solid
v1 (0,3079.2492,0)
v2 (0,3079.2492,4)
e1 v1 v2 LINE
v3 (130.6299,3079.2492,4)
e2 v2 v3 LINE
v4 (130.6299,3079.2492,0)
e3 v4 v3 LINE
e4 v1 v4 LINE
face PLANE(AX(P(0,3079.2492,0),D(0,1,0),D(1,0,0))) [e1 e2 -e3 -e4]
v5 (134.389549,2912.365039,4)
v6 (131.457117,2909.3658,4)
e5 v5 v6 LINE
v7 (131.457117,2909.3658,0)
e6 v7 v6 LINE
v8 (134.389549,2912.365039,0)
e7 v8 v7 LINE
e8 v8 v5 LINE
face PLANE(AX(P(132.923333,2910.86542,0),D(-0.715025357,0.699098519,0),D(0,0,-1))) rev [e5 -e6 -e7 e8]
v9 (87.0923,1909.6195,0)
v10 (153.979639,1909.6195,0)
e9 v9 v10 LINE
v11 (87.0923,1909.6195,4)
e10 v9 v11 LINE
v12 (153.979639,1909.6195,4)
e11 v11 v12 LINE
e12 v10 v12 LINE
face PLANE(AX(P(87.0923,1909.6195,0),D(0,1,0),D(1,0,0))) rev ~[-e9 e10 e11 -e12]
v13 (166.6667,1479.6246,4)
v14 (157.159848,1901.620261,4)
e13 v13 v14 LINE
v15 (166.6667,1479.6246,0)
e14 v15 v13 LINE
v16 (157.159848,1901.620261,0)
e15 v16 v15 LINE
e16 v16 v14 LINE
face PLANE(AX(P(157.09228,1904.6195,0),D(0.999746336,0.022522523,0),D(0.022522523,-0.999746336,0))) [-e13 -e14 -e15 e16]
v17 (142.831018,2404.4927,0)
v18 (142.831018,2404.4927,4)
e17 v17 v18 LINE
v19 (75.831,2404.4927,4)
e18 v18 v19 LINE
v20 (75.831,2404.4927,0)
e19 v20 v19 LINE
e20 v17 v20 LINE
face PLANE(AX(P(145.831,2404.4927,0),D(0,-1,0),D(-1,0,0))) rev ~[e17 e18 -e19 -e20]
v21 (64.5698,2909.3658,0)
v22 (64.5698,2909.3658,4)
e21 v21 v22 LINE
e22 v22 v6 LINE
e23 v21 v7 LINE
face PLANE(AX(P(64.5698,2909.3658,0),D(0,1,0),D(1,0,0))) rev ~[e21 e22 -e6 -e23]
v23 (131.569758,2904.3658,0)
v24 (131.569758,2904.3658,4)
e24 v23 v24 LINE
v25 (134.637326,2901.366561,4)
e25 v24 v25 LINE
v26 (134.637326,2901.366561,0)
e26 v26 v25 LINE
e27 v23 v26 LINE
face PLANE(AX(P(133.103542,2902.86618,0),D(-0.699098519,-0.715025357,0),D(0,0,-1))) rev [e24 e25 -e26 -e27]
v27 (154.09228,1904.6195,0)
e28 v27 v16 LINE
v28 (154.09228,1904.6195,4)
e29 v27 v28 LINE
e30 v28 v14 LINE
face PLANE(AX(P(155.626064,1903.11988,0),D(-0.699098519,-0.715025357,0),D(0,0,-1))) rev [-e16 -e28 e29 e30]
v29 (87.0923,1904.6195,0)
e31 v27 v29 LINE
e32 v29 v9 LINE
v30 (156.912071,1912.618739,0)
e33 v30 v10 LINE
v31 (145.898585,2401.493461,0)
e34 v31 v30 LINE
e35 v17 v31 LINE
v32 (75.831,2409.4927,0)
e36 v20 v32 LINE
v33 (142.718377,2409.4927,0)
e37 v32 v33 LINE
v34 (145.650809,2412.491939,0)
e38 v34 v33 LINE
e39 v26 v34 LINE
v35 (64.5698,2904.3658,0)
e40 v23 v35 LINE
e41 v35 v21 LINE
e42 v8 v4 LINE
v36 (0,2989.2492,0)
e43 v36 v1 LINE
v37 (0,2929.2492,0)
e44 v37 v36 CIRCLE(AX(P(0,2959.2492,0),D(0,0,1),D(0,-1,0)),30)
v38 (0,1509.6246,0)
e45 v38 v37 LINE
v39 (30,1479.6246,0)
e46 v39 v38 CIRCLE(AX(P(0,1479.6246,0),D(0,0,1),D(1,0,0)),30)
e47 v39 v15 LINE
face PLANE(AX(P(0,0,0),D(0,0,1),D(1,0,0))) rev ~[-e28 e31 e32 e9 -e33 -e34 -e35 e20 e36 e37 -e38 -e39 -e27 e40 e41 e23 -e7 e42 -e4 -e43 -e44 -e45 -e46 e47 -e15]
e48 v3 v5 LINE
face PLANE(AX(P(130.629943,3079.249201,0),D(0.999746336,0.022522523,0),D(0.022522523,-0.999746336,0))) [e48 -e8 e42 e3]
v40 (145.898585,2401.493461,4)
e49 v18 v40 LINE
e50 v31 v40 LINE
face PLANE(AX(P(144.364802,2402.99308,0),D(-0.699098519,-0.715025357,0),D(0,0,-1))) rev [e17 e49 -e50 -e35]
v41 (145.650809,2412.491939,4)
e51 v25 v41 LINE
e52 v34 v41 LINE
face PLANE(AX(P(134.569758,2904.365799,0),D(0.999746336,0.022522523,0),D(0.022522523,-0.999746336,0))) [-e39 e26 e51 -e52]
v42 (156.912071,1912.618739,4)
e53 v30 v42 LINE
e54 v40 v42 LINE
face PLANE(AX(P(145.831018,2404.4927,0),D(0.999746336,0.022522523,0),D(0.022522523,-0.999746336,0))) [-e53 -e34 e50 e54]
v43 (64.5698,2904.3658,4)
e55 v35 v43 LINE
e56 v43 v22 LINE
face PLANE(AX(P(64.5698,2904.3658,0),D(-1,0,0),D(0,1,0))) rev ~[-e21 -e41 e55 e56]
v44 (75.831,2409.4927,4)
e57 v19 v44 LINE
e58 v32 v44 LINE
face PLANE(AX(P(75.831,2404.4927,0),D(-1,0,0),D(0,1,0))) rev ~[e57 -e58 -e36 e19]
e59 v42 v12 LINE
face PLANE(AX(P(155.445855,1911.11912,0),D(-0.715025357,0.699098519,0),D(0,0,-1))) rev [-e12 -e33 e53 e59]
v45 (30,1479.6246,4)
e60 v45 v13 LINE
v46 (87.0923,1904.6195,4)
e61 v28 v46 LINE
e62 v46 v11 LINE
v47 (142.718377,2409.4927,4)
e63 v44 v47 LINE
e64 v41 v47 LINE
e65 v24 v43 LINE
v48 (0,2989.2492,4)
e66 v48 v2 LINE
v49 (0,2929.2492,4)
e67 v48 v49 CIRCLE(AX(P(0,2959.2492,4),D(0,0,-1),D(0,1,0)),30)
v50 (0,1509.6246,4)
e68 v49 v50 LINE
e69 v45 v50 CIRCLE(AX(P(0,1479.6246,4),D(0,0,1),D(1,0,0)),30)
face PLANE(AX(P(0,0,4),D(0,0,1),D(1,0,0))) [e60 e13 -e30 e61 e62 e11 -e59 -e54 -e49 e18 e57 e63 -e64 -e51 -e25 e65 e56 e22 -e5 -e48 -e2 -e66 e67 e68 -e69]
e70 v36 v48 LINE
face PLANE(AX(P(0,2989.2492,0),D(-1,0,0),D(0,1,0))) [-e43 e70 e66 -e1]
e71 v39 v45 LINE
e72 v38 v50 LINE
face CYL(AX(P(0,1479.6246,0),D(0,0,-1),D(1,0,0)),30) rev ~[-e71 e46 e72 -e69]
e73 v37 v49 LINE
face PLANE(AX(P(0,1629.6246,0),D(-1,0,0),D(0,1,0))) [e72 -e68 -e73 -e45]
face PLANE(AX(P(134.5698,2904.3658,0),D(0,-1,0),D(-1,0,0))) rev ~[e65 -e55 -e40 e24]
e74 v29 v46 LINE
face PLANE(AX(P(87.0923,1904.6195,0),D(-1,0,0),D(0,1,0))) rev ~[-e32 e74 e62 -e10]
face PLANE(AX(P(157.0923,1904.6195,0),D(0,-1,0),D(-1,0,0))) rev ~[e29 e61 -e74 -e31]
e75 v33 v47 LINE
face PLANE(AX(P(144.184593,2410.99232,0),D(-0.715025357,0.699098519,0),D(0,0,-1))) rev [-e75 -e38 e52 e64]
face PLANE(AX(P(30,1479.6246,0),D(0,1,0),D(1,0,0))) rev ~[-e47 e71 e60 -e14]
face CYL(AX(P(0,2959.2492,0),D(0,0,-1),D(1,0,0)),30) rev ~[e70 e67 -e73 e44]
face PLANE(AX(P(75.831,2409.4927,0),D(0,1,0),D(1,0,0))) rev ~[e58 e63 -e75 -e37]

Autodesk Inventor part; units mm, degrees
ref_plane "YZ Plane" through (0, 0, 0) normal (1, 0, 0) x (0, 1, 0)
ref_plane "XZ Plane" through (0, 0, 0) normal (0, 1, 0) x (-1, 0, 0)
ref_plane "XY Plane" through (0, 0, 0) normal (0, 0, 1) x (1, 0, 0)
sketch "Sketch1" plane through (0, 0, 0) normal (0, 0, 1) x (1, 0, 0)
  line L0 (0, 0) -> (0, 4438.8737)
  line L1 (0, 4438.8737) -> (100, 4438.8737)
  line L2 (100, 4438.8737) -> (200, 0)
  line L3 (200, 0) -> (0, 0)
  circle A0 centre (0, 0) radius 30
  line L4 (0, 1479.6246) -> (166.6667, 1479.6246)
  line L5 (0, 2959.2492) -> (133.3333, 2959.2492)
  circle A1 centre (0, 1479.6246) radius 30
  circle A2 centre (0, 2959.2492) radius 30
  line L6 (190.8761, 405) -> (120.8761, 405)
  line L7 (120.8761, 405) -> (120.8761, 410)
  line L8 (120.8761, 410) -> (190.8761, 410)
  line L9 (190.8761, 410) -> (190.8761, 405)
  line L10 (109.6148, 909.8732) -> (179.6148, 909.8732)
  line L11 (179.6148, 904.8732) -> (109.6148, 904.8732)
  line L12 (109.6148, 904.8732) -> (109.6148, 909.8732)
  line L13 (179.6148, 909.8732) -> (179.6148, 904.8732)
  line L14 (98.3535, 1409.7463) -> (168.3535, 1409.7463)
  line L15 (168.3535, 1404.7463) -> (98.3535, 1404.7463)
  line L16 (98.3535, 1404.7463) -> (98.3535, 1409.7463)
  line L17 (168.3535, 1409.7463) -> (168.3535, 1404.7463)
  line L18 (87.0923, 1909.6195) -> (157.0923, 1909.6195)
  line L19 (157.0923, 1904.6195) -> (87.0923, 1904.6195)
  line L20 (87.0923, 1904.6195) -> (87.0923, 1909.6195)
  line L21 (157.0923, 1909.6195) -> (157.0923, 1904.6195)
  line L22 (75.831, 2409.4927) -> (145.831, 2409.4927)
  line L23 (145.831, 2404.4927) -> (75.831, 2404.4927)
  line L24 (75.831, 2404.4927) -> (75.831, 2409.4927)
  line L25 (145.831, 2409.4927) -> (145.831, 2404.4927)
  line L26 (64.5698, 2909.3658) -> (134.5698, 2909.3658)
  line L27 (134.5698, 2904.3658) -> (64.5698, 2904.3658)
  line L28 (64.5698, 2904.3658) -> (64.5698, 2909.3658)
  line L29 (134.5698, 2909.3658) -> (134.5698, 2904.3658)
  line L30 (53.3085, 3409.239) -> (123.3085, 3409.239)
  line L31 (123.3085, 3404.239) -> (53.3085, 3404.239)
  line L32 (53.3085, 3404.239) -> (53.3085, 3409.239)
  line L33 (123.3085, 3409.239) -> (123.3085, 3404.239)
  line L34 (42.0472, 3909.1122) -> (112.0472, 3909.1122)
  line L35 (112.0472, 3904.1122) -> (42.0472, 3904.1122)
  line L36 (42.0472, 3904.1122) -> (42.0472, 3909.1122)
  line L37 (112.0472, 3909.1122) -> (112.0472, 3904.1122)
  line L38 (0, 1629.6246) -> (163.2874, 1629.6246)
  line L39 (0, 3079.2492) -> (130.6299, 3079.2492)
  point P0 (30, 2959.2492)
  point P1 (0, 2929.2492)
  point P2 (0, 1509.6246)
  point P3 (0, 1449.6246)
  point P4 (0, 30)
  point P5 (30, 0)
  point P6 (190.7634, 410)
  point P7 (179.5022, 909.8732)
  point P8 (168.3535, 1404.7463)
  point P9 (168.2409, 1409.7463)
  point P10 (30, 1479.6246)
  point P11 (157.0923, 1904.6195)
  point P12 (156.9796, 1909.6195)
  point P13 (145.831, 2404.4927)
  point P14 (145.7184, 2409.4927)
  point P15 (134.5698, 2904.3658)
  point P16 (134.4571, 2909.3658)
  point P17 (0, 2989.2492)
  dimension "d65" = 100
  dimension "d67" = 200
  dimension "d68" = 60
  dimension "d69" = 1480
  dimension "d70" = 1480
  dimension "d71" = 1480
  dimension "d72" = 5
  dimension "d73" = 70
  dimension "d74" = 410
  dimension "d77" = 500
  dimension "d82" = 120
  dimension "d83" = 150
extrude "Plate3" add sketch "Sketch1" along normal blind 4 contours L39 L2 L5 A2 L0 | L5 L2 L26 L28 L27 L22 L24 L23 L18 L20 L19 L38 L0 A2 | L38 L2 L4 A1 L0
chamfer "Corner Chamfer2" distance 3 angle 45 6 edges at (157.0923, 1904.6195, 2) (156.9796, 1909.6195, 2) (145.831, 2404.4927, 2) (145.7184, 2409.4927, 2) (134.5698, 2904.3658, 2) (134.4571, 2909.3658, 2)
equation "\"BendRadius\" = Thickness"
equation "\"BendReliefWidth\" = Thickness"
equation "\"BendReliefDepth\" = 0.5 * Thickness"
equation "\"CornerReliefSize\" = 4 * Thickness"
equation "\"MinimumRemnant\" = 2 * Thickness"
equation "\"TransitionRadius\" = BendRadius"
equation "\"JacobiRadiusSize\" = BendRadius"
equation "\"GapSize\" = Thickness"
equation "\"Thickness\" = 4"
properties part number "GBK 3212 central second rib_CPY" material "Steel"
